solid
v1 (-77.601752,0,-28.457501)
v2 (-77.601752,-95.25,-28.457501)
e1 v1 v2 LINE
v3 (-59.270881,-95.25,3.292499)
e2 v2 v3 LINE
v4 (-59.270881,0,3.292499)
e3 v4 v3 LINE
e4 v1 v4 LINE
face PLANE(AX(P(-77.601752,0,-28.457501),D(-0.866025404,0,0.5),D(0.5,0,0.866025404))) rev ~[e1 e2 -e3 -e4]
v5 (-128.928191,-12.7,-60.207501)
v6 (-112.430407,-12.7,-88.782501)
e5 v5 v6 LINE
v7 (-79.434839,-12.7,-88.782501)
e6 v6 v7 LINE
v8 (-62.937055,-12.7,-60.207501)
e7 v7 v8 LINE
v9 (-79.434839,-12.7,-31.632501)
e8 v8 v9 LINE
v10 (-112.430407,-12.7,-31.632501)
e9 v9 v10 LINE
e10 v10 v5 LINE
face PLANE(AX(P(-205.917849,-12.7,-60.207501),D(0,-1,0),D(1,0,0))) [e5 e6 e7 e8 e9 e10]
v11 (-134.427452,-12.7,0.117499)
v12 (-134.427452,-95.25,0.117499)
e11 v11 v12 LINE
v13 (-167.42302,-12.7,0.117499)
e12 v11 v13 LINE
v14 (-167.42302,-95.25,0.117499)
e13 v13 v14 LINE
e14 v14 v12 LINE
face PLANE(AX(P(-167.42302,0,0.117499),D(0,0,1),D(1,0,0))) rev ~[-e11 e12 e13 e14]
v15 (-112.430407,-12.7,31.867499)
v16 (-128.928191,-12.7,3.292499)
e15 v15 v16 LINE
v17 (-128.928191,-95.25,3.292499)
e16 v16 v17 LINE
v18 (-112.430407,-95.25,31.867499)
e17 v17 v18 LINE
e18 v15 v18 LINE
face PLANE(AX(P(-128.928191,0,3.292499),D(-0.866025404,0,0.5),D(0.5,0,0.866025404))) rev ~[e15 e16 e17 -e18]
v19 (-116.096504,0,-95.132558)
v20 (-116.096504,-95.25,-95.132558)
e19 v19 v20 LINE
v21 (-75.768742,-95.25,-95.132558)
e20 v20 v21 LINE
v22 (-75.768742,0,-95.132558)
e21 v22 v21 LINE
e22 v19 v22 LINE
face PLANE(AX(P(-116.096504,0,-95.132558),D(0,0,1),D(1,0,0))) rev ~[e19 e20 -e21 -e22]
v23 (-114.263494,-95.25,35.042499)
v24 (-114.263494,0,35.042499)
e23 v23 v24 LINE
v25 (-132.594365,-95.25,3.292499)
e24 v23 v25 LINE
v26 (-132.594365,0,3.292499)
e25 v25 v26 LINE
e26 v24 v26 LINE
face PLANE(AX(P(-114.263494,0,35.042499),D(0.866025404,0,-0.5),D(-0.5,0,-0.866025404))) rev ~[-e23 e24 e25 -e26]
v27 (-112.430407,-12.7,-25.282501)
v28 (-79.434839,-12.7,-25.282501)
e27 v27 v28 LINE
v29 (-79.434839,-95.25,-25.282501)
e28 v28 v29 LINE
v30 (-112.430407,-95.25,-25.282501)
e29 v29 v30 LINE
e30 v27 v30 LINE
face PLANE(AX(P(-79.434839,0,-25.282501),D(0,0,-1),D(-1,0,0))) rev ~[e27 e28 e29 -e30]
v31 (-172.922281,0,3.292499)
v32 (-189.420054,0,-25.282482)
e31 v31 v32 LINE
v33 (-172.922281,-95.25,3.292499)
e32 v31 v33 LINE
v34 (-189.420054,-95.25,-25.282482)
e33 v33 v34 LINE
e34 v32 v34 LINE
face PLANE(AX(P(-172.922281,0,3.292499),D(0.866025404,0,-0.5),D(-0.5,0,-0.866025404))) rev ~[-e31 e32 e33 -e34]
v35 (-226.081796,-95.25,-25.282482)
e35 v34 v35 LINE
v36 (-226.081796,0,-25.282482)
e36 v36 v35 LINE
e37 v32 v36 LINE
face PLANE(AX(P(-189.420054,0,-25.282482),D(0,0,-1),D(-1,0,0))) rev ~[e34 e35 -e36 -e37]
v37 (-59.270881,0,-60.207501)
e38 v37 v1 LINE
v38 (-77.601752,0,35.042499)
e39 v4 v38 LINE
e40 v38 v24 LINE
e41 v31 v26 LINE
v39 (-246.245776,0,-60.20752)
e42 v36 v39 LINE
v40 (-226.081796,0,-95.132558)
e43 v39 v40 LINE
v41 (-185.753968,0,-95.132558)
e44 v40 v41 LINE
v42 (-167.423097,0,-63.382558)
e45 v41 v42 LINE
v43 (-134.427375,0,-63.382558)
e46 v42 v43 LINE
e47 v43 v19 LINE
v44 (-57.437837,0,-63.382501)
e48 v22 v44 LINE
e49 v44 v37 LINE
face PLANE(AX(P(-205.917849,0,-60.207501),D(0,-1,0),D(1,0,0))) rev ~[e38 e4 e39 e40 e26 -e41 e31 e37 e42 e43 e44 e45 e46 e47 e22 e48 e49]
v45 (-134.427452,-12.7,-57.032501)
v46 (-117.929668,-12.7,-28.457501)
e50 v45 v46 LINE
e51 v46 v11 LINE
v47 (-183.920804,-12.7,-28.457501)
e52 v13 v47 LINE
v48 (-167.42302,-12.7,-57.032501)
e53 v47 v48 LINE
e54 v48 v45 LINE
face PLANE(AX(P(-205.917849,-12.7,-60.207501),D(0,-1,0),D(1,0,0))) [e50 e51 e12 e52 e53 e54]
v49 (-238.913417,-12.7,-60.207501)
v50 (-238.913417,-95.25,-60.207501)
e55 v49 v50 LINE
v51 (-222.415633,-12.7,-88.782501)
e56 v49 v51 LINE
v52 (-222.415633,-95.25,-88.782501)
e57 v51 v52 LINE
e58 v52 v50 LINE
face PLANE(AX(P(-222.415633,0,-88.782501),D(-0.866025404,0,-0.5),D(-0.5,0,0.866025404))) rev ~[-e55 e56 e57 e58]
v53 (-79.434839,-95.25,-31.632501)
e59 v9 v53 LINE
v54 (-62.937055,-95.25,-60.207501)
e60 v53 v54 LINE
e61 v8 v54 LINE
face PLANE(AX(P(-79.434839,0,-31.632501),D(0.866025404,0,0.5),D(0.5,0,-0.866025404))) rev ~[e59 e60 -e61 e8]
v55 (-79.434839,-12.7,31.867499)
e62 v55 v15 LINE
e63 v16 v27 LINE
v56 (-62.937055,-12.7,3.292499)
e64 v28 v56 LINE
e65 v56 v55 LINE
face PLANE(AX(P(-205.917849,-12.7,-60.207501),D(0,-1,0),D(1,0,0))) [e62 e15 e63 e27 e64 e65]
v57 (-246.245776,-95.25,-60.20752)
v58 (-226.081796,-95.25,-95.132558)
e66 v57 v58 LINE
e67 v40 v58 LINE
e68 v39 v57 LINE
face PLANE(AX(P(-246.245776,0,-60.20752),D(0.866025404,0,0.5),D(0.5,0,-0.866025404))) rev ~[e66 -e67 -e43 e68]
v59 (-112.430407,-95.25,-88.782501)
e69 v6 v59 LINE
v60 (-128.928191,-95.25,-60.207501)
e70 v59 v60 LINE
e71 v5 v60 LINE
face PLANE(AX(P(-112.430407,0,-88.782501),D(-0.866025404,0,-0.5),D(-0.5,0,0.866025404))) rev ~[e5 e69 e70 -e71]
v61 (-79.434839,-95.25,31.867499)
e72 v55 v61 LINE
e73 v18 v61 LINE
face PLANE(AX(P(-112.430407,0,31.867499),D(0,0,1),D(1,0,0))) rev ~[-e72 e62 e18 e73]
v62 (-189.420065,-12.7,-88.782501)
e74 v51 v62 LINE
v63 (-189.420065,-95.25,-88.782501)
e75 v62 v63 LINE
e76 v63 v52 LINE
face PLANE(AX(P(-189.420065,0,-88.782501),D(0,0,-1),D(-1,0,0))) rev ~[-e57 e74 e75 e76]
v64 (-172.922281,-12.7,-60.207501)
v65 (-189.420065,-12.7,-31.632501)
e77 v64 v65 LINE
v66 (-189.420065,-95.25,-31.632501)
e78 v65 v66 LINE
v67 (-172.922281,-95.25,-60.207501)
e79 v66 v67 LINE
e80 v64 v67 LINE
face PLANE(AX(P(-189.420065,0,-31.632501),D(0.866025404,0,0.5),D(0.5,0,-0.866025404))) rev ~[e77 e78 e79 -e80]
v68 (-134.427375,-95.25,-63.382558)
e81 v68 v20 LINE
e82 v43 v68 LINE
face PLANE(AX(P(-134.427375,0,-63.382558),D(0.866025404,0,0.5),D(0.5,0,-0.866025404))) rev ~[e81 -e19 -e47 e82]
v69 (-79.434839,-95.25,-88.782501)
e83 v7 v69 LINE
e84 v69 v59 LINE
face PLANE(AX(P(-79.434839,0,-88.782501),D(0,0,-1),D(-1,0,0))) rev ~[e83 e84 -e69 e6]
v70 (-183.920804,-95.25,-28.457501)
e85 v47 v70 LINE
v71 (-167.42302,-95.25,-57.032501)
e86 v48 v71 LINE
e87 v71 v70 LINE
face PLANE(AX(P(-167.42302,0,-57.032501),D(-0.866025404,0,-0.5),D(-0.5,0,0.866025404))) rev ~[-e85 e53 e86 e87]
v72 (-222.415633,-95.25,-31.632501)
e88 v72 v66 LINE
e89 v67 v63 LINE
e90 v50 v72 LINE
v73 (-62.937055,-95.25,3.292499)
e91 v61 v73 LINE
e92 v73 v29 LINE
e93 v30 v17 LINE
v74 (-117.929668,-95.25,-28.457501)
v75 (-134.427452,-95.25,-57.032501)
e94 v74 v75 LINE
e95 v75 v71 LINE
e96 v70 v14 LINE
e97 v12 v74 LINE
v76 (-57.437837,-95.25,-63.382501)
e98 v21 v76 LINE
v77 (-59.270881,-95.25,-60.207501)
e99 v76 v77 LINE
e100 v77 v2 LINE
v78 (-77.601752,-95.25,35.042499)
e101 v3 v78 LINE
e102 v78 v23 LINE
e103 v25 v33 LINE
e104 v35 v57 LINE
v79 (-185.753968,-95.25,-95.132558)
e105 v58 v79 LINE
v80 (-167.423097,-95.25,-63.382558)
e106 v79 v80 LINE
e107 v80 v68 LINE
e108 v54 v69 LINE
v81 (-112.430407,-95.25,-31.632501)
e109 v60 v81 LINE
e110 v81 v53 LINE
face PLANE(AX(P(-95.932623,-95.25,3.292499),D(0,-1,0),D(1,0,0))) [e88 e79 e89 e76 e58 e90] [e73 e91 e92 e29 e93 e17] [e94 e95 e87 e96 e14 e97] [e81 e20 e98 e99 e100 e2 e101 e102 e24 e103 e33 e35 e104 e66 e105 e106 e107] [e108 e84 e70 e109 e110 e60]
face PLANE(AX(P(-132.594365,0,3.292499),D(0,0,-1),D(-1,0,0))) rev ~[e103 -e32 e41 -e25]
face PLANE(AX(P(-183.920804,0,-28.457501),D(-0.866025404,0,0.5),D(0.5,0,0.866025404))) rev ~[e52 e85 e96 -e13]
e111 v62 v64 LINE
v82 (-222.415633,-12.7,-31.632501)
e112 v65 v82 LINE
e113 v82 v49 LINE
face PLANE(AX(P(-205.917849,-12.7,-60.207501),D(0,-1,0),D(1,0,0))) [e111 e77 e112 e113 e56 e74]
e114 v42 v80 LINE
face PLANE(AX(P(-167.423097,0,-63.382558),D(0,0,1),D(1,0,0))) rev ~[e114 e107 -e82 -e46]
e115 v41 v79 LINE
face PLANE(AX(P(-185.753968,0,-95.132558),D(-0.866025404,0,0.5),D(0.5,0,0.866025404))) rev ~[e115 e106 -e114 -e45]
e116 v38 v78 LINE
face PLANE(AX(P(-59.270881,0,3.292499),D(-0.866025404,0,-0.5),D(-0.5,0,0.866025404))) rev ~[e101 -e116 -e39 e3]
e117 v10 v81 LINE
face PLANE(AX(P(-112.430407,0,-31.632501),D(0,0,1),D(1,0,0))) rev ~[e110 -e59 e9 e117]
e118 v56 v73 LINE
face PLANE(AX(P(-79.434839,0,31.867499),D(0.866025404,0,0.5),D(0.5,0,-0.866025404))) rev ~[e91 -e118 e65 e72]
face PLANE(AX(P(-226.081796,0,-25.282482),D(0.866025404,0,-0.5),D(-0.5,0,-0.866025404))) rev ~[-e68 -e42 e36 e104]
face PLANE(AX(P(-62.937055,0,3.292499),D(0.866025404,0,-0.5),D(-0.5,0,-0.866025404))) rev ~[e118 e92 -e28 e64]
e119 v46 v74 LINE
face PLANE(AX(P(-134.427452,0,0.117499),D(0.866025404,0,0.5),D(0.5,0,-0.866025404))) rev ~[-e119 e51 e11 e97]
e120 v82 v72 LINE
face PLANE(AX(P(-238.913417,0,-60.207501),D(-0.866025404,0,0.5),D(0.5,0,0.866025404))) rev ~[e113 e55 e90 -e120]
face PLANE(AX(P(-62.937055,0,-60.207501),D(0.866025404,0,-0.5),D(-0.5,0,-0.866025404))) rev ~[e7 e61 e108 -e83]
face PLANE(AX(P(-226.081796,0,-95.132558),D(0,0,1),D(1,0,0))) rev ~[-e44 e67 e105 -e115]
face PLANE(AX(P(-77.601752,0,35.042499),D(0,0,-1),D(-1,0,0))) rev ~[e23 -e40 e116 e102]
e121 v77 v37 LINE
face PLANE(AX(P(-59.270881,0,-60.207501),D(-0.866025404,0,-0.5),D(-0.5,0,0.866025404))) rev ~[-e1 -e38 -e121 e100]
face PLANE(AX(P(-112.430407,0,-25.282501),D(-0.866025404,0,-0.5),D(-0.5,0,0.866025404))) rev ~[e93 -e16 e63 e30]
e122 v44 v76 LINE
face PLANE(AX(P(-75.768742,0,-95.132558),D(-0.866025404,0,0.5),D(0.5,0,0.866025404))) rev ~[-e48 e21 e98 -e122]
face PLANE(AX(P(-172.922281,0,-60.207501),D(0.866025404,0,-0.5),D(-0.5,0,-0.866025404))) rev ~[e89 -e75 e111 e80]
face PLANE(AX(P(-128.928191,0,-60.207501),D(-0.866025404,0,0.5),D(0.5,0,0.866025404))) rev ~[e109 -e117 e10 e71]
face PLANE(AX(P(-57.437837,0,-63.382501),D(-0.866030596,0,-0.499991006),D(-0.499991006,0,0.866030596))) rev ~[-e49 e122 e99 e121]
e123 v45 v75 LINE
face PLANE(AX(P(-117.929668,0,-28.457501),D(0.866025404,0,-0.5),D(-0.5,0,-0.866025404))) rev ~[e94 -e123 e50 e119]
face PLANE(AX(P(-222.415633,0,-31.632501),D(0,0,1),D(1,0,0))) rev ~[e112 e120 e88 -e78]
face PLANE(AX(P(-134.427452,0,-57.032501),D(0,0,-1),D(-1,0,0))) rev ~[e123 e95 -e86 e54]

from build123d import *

# Parameters (mm, degrees)
F1_DEPTH = 12.7
F2_DEPTH = 95.25


# Not quite as in the source:
# - a feature names something its author has since deleted; it is built from what else it names


with BuildPart() as f1:
    # F0 (on Front) → F1 (new body)
    with BuildSketch(Plane.XZ):
        Polygon((-187.5869779497, -91.9575006988), (-169.2561069029, -60.2075006988), (-187.5869779497, -28.4575006988), (-224.2487200432, -28.4575006988), (-242.57959109, -60.2075006988), (-224.2487200432, -91.9575006988), align=None)
        Polygon((-222.4156329385, -88.7825006988), (-238.9134168806, -60.2075006988), (-222.4156329385, -31.6325006988), (-189.4200650544, -31.6325006988), (-172.9222811123, -60.2075006988), (-189.4200650544, -88.7825006988), align=None, mode=Mode.SUBTRACT)
        Polygon((-59.2708806223, -60.2075006988), (-77.6017516691, -28.4575006988), (-114.2634937626, -28.4575006988), (-132.5943648094, -60.2075006988), (-114.2634937626, -91.9575006988), (-77.6017516691, -91.9575006988), align=None)
        Polygon((-112.4304066579, -88.7825006988), (-128.9281906, -60.2075006988), (-112.4304066579, -31.6325006988), (-79.4348387737, -31.6325006988), (-62.9370548316, -60.2075006988), (-79.4348387737, -88.7825006988), align=None, mode=Mode.SUBTRACT)
        Polygon((-77.6017516691, -28.4575006988), (-59.2708806223, 3.2924993012), (-77.6017516691, 35.0424993012), (-114.2634937626, 35.0424993012), (-132.5943648094, 3.2924993012), (-114.2634937626, -28.4575006988), align=None)
        Polygon((-112.4304066579, -25.2825006988), (-128.9281906, 3.2924993012), (-112.4304066579, 31.8674993012), (-79.4348387737, 31.8674993012), (-62.9370548316, 3.2924993012), (-79.4348387737, -25.2825006988), align=None, mode=Mode.SUBTRACT)
        Polygon((-132.5943648094, -60.2075006988), (-114.2634937626, -28.4575006988), (-132.5943648094, 3.2924993012), (-169.2561069029, 3.2924993012), (-187.5869779497, -28.4575006988), (-169.2561069029, -60.2075006988), align=None)
        Polygon((-167.4230197982, -57.0325006988), (-183.9208037403, -28.4575006988), (-167.4230197982, 0.1174993012), (-134.4274519141, 0.1174993012), (-117.929667972, -28.4575006988), (-134.4274519141, -57.0325006988), align=None, mode=Mode.SUBTRACT)
        Polygon((-222.4156329385, -31.6325006988), (-238.9134168806, -60.2075006988), (-222.4156329385, -88.7825006988), (-189.4200650544, -88.7825006988), (-172.9222811123, -60.2075006988), (-189.4200650544, -31.6325006988), align=None)
        Polygon((-112.4304066579, -31.6325006988), (-128.9281906, -60.2075006988), (-112.4304066579, -88.7825006988), (-79.4348387737, -88.7825006988), (-62.9370548316, -60.2075006988), (-79.4348387737, -31.6325006988), align=None)
        Polygon((-167.4230197982, 0.1174993012), (-183.9208037403, -28.4575006988), (-167.4230197982, -57.0325006988), (-134.4274519141, -57.0325006988), (-117.929667972, -28.4575006988), (-134.4274519141, 0.1174993012), align=None)
        Polygon((-112.4304066579, 31.8674993012), (-128.9281906, 3.2924993012), (-112.4304066579, -25.2825006988), (-79.4348387737, -25.2825006988), (-62.9370548316, 3.2924993012), (-79.4348387737, 31.8674993012), align=None)
    extrude(amount=F1_DEPTH)

    # F0 (on Front) → F2 (join)
    with BuildSketch(Plane.XZ):
        Polygon((-77.6017516691, -28.4575006988), (-59.2708806223, 3.2924993012), (-77.6017516691, 35.0424993012), (-114.2634937626, 35.0424993012), (-132.5943648094, 3.2924993012), (-114.2634937626, -28.4575006988), align=None)
        Polygon((-112.4304066579, -25.2825006988), (-128.9281906, 3.2924993012), (-112.4304066579, 31.8674993012), (-79.4348387737, 31.8674993012), (-62.9370548316, 3.2924993012), (-79.4348387737, -25.2825006988), align=None, mode=Mode.SUBTRACT)
        Polygon((-59.2708806223, -60.2075006988), (-77.6017516691, -28.4575006988), (-114.2634937626, -28.4575006988), (-132.5943648094, -60.2075006988), (-114.2634937626, -91.9575006988), (-77.6017516691, -91.9575006988), align=None)
        Polygon((-112.4304066579, -88.7825006988), (-128.9281906, -60.2075006988), (-112.4304066579, -31.6325006988), (-79.4348387737, -31.6325006988), (-62.9370548316, -60.2075006988), (-79.4348387737, -88.7825006988), align=None, mode=Mode.SUBTRACT)
        Polygon((-132.5943648094, -60.2075006988), (-114.2634937626, -28.4575006988), (-132.5943648094, 3.2924993012), (-169.2561069029, 3.2924993012), (-187.5869779497, -28.4575006988), (-169.2561069029, -60.2075006988), align=None)
        Polygon((-167.4230197982, -57.0325006988), (-183.9208037403, -28.4575006988), (-167.4230197982, 0.1174993012), (-134.4274519141, 0.1174993012), (-117.929667972, -28.4575006988), (-134.4274519141, -57.0325006988), align=None, mode=Mode.SUBTRACT)
        Polygon((-187.5869779497, -91.9575006988), (-169.2561069029, -60.2075006988), (-187.5869779497, -28.4575006988), (-224.2487200432, -28.4575006988), (-242.57959109, -60.2075006988), (-224.2487200432, -91.9575006988), align=None)
        Polygon((-222.4156329385, -88.7825006988), (-238.9134168806, -60.2075006988), (-222.4156329385, -31.6325006988), (-189.4200650544, -31.6325006988), (-172.9222811123, -60.2075006988), (-189.4200650544, -88.7825006988), align=None, mode=Mode.SUBTRACT)
        Polygon((-57.4378374826, -63.3825006988), (-59.2708806223, -60.2075006988), (-77.6017516691, -91.9575006988), (-114.2634937626, -91.9575006988), (-132.5943648094, -60.2075006988), (-169.2561069029, -60.2075006988), (-187.5869779497, -91.9575006988), (-224.2487200432, -91.9575006988), (-242.57959109, -60.2075006988), (-224.2487200432, -28.4575006988), (-187.5869779497, -28.4575006988), (-169.2561069029, 3.2924993012), (-172.9222811123, 3.2924993012), (-189.4200540638, -25.2824816625), (-226.0817961573, -25.2824816625), (-246.24577629, -60.2075197352), (-226.0817961573, -95.1325578078), (-185.7539677819, -95.1325578078), (-167.4230967351, -63.3825578078), (-134.4273749772, -63.3825578078), (-116.0965039304, -95.1325578078), (-75.7687415012, -95.1325578078), align=None)
    extrude(amount=F2_DEPTH)


solid = f1.part
